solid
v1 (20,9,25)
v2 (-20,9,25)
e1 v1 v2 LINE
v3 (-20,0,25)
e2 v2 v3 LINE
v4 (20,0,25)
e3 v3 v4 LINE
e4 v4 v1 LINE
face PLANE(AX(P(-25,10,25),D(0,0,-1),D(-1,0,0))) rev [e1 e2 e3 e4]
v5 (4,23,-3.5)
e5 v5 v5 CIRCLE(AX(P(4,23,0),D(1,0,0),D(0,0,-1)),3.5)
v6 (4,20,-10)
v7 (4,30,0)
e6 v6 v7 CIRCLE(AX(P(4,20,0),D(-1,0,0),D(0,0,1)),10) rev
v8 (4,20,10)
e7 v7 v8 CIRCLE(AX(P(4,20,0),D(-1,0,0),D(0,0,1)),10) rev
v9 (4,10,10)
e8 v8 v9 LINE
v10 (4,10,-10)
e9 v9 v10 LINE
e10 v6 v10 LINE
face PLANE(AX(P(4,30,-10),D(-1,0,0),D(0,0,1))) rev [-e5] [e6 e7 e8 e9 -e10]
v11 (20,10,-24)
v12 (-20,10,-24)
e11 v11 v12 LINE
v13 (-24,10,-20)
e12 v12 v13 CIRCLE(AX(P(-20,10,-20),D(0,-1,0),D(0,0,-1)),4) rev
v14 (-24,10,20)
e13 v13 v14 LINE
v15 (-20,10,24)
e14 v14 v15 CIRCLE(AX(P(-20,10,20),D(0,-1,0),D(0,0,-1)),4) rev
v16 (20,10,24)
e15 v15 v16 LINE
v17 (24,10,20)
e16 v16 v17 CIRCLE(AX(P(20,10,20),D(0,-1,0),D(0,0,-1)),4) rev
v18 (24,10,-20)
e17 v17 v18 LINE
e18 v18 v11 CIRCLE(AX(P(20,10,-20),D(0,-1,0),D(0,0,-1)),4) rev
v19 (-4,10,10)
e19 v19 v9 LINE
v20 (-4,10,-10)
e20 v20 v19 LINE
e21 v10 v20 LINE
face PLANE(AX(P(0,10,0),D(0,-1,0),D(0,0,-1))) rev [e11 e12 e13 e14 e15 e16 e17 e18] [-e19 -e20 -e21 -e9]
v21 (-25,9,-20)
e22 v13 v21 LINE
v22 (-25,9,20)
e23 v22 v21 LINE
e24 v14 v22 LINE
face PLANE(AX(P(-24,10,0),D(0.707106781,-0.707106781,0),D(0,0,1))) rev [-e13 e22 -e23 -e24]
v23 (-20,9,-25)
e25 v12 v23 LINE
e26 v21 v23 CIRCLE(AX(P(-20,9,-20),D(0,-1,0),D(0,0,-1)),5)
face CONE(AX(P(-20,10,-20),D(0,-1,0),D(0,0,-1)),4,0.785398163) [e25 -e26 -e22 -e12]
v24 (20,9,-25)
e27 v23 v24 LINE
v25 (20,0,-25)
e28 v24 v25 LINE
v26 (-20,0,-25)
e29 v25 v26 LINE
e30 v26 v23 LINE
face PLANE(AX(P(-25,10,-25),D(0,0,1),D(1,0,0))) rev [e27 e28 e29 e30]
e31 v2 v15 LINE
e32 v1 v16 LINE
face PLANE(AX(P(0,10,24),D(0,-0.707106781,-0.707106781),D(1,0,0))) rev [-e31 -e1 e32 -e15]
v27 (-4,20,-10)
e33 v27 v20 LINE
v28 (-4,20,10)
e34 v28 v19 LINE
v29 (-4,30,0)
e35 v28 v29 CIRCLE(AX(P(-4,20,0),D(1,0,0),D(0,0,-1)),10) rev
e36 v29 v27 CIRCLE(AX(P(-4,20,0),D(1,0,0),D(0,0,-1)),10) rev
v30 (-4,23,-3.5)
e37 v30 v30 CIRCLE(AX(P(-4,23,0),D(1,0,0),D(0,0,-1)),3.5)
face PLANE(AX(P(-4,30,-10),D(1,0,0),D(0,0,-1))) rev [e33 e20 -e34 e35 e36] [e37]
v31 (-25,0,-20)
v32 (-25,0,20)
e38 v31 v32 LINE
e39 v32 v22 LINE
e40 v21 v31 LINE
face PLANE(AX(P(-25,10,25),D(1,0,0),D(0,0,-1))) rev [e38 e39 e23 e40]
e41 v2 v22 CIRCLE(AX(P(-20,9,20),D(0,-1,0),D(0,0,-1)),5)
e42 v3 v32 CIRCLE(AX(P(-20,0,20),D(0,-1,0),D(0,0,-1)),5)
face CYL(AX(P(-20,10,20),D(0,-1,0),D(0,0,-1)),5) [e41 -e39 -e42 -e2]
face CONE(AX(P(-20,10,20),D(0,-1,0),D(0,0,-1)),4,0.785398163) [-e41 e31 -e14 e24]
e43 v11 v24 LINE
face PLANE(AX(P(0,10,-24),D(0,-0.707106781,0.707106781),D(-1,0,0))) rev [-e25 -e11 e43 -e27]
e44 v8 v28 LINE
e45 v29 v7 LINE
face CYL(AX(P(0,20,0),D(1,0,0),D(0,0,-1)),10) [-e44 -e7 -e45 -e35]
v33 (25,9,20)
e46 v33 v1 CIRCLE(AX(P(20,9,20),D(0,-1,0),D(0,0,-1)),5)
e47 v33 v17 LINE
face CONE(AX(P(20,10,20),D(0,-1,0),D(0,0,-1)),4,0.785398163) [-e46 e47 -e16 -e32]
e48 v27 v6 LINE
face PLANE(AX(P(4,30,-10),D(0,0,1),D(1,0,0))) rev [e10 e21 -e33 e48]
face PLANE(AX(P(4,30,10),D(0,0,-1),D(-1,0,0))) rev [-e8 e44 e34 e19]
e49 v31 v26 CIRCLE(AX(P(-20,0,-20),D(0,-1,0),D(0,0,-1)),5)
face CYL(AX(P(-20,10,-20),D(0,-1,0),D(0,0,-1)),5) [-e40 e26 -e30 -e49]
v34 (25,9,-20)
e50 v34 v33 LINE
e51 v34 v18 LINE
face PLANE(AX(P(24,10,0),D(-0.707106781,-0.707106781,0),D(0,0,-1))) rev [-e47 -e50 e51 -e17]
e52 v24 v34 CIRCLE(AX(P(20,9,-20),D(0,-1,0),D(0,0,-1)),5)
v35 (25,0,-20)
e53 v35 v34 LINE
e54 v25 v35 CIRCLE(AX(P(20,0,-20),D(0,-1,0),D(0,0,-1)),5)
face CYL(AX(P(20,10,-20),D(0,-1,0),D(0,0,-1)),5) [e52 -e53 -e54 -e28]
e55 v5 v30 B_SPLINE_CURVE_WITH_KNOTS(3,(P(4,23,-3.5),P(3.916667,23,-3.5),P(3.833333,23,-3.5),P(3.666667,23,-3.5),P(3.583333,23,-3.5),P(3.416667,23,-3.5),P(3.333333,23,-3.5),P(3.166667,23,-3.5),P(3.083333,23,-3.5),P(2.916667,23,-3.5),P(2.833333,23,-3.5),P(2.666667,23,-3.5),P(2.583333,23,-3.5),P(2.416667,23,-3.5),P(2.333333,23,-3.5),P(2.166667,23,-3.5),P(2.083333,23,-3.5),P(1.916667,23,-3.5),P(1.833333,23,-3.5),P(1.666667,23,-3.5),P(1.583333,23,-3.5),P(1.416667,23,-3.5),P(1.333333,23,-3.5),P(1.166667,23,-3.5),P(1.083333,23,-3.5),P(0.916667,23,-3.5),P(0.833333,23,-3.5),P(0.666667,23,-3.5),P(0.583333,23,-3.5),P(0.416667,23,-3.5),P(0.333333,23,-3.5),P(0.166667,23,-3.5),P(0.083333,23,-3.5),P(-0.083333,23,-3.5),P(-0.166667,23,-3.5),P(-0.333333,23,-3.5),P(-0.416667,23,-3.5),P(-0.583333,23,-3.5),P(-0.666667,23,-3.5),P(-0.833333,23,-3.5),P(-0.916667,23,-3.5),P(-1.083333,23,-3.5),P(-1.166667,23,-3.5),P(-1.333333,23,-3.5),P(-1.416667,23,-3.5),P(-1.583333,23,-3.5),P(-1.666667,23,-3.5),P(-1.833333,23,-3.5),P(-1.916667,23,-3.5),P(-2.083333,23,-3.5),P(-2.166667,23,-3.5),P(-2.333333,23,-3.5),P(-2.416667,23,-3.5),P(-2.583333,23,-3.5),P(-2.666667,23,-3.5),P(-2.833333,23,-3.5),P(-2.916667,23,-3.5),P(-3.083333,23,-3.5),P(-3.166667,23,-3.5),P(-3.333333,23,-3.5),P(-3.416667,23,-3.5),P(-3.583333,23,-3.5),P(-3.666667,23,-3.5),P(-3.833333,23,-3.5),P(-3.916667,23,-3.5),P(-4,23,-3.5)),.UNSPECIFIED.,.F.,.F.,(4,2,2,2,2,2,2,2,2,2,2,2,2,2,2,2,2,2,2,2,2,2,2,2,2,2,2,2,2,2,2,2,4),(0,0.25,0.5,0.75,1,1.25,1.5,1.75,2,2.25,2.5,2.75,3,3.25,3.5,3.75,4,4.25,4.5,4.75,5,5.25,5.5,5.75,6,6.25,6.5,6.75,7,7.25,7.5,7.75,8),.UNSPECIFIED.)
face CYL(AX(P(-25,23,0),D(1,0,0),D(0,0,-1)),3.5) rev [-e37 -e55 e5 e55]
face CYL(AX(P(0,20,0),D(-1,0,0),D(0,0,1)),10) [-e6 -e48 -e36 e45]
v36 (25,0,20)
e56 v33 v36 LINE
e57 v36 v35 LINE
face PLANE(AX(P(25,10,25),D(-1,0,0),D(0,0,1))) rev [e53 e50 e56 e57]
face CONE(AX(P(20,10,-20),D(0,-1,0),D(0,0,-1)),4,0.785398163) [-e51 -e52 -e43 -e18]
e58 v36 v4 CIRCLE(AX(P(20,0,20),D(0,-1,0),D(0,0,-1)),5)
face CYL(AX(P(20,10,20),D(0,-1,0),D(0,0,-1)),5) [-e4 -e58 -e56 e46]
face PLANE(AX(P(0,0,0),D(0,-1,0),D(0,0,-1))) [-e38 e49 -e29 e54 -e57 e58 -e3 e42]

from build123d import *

# Parameters (mm, degrees)
CROQUIS1_W              = 50
CROQUIS1_H              = 50
SALIENTE_EXTRUIR1_DEPTH = 10
CROQUIS2_W              = 8
CROQUIS2_H              = 20
SALIENTE_EXTRUIR2_DEPTH = 20
CROQUIS3_R              = 3.5
CORTAR_EXTRUIR1_DEPTH   = 49.641546028
REDONDEO1_R             = 10
REDONDEO2_R             = 5
CHAFL_N1_SIZE           = 1


with BuildPart() as part:
    # Croquis1 → Saliente-Extruir1 (new body)
    with BuildSketch(Plane(origin=(0, 0, 0), x_dir=(1, 0, 0), z_dir=(0, 1, 0))):
        Rectangle(CROQUIS1_W, CROQUIS1_H)
    extrude(amount=SALIENTE_EXTRUIR1_DEPTH)

    # Croquis2 → Saliente-Extruir2 (add)
    with BuildSketch(Plane(origin=(0, 10, 0), x_dir=(1, 0, 0), z_dir=(0, 1, 0))):
        Rectangle(CROQUIS2_W, CROQUIS2_H)
    extrude(amount=SALIENTE_EXTRUIR2_DEPTH)

    # Croquis3 → Cortar-Extruir1 (cut, through all)
    with BuildSketch(Plane(origin=(4, 0, 0), x_dir=(0, 0, -1), z_dir=(1, 0, 0))):
        with Locations((0, 23)):
            Circle(CROQUIS3_R)
    extrude(amount=-CORTAR_EXTRUIR1_DEPTH, mode=Mode.SUBTRACT)

    # Redondeo1
    redondeo1_edges = [part.edges().sort_by_distance(p)[0] for p in [
        (0, 30, -10),
        (0, 30, 10),
    ]]
    fillet(redondeo1_edges, radius=REDONDEO1_R - 0.0001)  # a hair under: the kernel refuses the full size

    # Redondeo2
    redondeo2_edges = [part.edges().sort_by_distance(p)[0] for p in [
        (25, 5, 25),
        (-25, 5, 25),
        (-25, 5, -25),
        (25, 5, -25),
    ]]
    fillet(redondeo2_edges, radius=REDONDEO2_R)

    # Chaflán1
    chafl_n1_edges = [part.edges().sort_by_distance(p)[0] for p in [
        (-25, 10, 0),
        (0, 10, -25),
        (25, 10, 0),
        (0, 10, 25),
        (-23.535533906, 10, 23.535533906),
        (23.535533906, 10, 23.535533906),
        (23.535533906, 10, -23.535533906),
        (-23.535533906, 10, -23.535533906),
    ]]
    chamfer(chafl_n1_edges, length=CHAFL_N1_SIZE)


solid = part.part
